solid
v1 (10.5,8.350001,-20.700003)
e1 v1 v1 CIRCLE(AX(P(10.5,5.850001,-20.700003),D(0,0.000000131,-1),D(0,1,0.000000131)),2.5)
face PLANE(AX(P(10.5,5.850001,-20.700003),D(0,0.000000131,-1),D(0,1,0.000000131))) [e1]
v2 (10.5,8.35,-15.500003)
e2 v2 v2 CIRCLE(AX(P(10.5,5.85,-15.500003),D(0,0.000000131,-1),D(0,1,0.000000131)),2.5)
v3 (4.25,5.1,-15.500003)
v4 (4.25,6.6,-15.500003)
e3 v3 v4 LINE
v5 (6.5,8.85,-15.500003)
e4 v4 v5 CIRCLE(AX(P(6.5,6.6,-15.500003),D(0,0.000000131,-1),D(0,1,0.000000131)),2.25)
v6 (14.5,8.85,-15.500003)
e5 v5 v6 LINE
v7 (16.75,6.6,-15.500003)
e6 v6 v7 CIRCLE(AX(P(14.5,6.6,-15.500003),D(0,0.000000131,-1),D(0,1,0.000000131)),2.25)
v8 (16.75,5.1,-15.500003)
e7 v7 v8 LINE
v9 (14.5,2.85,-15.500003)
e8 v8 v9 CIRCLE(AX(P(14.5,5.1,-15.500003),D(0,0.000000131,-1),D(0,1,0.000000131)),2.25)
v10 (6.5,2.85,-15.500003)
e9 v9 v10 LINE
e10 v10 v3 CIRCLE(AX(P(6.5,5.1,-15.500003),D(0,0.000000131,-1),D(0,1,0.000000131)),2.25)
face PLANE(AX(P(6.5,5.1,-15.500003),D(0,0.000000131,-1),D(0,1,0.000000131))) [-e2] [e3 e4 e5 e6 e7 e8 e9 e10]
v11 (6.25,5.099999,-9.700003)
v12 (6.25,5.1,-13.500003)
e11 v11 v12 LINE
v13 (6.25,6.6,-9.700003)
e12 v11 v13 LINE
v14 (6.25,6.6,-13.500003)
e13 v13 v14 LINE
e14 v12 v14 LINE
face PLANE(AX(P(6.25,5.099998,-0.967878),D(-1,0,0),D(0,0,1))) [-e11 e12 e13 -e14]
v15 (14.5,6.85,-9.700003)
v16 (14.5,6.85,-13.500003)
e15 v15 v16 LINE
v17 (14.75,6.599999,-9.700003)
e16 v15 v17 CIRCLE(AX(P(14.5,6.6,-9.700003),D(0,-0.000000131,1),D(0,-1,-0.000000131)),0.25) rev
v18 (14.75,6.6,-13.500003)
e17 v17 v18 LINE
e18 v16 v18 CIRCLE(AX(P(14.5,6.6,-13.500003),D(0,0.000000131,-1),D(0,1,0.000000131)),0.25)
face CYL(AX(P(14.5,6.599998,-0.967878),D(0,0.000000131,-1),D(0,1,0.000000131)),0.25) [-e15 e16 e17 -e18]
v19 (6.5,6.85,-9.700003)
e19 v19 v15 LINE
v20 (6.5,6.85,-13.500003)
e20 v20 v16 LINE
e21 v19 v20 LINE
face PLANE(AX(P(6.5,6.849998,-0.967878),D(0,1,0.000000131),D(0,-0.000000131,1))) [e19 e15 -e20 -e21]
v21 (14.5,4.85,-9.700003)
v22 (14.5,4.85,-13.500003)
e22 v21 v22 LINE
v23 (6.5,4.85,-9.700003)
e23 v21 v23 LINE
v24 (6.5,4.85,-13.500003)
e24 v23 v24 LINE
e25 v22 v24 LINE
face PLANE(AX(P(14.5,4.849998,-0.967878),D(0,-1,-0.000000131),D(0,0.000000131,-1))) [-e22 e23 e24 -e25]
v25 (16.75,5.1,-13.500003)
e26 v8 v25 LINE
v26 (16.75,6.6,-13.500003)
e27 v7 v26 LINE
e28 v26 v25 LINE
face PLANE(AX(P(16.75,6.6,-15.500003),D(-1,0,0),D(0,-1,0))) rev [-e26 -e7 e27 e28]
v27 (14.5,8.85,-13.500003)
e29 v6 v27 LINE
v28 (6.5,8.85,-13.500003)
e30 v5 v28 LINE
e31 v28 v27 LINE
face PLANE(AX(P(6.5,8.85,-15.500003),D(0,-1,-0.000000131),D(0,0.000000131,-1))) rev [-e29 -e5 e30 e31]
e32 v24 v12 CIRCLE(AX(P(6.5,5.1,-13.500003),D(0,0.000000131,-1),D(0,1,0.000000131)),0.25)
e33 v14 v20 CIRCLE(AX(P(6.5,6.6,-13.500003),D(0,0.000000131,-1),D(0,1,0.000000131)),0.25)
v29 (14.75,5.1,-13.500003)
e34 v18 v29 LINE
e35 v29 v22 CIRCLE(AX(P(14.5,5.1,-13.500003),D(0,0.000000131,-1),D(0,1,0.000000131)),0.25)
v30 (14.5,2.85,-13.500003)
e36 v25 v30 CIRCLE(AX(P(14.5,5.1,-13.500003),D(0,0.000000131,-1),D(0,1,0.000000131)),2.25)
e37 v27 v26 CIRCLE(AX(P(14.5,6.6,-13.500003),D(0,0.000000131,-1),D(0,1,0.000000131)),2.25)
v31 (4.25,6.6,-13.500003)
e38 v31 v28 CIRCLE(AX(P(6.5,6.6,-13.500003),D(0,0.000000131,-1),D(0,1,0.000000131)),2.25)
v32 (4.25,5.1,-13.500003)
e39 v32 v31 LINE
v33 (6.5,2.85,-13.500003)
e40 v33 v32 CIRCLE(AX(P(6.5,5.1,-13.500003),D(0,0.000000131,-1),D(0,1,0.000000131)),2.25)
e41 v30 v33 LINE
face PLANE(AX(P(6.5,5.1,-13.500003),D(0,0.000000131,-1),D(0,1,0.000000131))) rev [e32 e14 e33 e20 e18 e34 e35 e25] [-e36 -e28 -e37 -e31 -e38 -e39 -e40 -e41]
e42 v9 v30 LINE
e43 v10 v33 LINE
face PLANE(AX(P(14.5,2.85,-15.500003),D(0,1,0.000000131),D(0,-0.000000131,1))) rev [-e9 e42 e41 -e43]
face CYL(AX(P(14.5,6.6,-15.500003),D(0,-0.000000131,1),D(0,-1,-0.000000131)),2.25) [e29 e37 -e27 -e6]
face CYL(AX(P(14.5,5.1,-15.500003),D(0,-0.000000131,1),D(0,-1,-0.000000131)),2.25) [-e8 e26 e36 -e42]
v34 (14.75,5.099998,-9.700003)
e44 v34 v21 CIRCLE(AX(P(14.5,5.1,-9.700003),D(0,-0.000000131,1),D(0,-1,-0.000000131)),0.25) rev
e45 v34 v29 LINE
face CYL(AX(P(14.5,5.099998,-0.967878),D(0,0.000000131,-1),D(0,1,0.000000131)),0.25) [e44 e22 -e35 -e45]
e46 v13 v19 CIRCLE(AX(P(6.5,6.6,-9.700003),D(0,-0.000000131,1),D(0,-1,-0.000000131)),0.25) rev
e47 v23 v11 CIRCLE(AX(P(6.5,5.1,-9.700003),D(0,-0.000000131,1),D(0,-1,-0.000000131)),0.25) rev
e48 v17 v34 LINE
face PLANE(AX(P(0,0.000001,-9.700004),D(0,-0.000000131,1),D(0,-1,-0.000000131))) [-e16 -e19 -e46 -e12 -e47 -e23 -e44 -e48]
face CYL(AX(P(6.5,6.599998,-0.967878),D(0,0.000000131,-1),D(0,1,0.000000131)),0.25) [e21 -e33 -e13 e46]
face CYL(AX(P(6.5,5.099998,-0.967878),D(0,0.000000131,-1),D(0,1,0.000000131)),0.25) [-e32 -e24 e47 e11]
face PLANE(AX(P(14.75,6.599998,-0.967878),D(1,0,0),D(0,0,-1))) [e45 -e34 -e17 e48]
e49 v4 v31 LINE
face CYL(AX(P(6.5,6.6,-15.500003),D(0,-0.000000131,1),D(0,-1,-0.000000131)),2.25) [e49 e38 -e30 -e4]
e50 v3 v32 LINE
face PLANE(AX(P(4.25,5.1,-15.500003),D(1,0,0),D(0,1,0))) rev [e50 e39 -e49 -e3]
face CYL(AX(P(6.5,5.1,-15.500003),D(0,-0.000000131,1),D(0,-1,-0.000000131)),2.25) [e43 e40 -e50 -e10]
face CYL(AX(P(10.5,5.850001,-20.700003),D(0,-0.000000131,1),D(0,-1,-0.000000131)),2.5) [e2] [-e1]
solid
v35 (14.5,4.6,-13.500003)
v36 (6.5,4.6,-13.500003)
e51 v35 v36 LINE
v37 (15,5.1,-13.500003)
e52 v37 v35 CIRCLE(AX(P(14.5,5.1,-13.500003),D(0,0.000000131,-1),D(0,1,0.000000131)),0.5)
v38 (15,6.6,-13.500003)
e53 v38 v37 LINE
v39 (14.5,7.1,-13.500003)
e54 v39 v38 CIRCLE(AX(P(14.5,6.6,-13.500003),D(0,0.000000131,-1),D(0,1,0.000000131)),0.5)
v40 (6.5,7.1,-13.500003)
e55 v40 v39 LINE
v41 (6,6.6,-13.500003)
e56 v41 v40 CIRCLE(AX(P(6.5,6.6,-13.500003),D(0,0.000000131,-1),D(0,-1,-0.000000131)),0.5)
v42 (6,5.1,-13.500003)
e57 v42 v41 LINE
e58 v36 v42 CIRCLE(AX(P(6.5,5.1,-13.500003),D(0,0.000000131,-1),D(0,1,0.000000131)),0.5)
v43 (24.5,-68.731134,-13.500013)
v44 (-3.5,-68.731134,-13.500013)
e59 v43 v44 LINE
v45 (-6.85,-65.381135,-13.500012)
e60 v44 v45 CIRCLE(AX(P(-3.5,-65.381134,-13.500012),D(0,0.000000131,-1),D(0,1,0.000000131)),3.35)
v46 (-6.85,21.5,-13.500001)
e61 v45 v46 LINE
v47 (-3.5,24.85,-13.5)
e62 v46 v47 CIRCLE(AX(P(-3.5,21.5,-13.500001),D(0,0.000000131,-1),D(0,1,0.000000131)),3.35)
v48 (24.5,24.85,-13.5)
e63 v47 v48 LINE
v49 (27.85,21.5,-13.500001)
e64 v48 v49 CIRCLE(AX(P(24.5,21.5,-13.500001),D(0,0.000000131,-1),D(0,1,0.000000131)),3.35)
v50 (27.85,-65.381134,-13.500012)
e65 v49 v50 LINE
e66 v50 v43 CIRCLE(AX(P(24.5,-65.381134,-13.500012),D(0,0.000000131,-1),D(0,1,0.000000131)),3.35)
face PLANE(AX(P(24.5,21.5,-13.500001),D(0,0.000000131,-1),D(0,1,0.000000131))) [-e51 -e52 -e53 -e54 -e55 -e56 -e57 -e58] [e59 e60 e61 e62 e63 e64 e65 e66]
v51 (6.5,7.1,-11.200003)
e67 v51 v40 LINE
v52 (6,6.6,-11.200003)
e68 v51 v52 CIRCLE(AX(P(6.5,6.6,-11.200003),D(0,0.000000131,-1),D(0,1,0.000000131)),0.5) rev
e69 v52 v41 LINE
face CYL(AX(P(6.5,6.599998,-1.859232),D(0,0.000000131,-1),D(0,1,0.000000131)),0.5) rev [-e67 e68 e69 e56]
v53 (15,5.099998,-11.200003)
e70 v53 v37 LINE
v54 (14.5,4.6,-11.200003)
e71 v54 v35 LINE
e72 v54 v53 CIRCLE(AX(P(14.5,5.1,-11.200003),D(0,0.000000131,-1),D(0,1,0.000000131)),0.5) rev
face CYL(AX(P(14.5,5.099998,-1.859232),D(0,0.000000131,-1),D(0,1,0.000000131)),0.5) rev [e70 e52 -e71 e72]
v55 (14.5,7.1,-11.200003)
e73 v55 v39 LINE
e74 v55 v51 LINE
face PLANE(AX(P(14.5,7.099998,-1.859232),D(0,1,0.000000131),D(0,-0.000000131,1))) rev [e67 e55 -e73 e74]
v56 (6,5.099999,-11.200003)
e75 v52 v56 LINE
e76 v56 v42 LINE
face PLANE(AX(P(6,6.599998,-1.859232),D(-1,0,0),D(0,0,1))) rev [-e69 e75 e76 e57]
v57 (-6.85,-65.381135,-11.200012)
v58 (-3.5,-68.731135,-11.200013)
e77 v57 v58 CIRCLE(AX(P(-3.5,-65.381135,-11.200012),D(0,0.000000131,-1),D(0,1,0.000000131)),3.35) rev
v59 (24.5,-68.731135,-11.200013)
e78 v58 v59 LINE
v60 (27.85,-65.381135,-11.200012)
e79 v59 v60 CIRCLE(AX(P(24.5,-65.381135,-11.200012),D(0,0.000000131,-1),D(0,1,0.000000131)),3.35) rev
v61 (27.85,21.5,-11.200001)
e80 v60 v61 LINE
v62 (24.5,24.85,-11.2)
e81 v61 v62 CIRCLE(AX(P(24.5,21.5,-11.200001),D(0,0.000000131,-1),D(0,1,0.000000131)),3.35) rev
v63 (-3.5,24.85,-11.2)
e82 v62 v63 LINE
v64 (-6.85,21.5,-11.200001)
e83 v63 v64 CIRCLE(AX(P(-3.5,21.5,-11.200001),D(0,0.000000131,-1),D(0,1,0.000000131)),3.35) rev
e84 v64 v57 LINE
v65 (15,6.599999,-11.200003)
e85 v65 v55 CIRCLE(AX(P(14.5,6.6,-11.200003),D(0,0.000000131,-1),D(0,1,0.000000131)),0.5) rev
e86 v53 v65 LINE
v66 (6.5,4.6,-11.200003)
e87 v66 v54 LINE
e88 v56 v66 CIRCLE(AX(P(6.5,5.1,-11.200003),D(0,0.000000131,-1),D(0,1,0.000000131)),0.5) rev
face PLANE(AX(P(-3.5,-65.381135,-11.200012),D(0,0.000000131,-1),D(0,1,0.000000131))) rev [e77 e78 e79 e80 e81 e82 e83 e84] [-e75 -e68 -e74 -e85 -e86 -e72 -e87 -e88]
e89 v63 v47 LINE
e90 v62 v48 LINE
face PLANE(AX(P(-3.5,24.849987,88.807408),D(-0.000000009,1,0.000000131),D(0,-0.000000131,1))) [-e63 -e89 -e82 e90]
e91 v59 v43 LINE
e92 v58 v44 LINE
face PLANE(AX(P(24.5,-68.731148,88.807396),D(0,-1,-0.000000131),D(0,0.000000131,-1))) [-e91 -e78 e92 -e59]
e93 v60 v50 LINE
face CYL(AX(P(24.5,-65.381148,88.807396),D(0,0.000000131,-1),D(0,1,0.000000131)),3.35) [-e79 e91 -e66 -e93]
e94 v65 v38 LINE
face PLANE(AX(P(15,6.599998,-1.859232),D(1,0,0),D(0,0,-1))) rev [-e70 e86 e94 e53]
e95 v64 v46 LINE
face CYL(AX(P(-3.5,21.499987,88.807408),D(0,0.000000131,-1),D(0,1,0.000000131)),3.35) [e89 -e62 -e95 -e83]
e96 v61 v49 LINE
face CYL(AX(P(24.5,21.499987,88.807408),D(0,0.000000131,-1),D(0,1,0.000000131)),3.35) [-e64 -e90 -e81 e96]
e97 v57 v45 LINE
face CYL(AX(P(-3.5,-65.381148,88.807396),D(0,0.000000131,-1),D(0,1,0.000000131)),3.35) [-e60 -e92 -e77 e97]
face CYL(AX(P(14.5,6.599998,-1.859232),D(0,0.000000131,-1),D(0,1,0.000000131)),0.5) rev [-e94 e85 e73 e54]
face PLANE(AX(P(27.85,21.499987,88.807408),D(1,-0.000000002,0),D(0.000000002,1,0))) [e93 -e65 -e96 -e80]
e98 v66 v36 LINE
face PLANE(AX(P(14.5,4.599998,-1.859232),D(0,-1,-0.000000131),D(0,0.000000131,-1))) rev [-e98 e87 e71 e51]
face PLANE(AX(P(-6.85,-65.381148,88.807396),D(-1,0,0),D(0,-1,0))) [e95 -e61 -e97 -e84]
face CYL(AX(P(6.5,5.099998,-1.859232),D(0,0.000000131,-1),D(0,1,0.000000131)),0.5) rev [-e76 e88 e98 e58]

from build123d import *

# Parameters (mm, degrees)
STOCK_PB_TOP_LID_SM_1_START = 11.200003695
STOCK_PB_TOP_LID_SM_1_DEPTH = 2.3
BOSS_EXTRUDE1_DEPTH         = 3.8
BOSS_EXTRUDE2_DEPTH         = 2
SKETCH5_R                   = 2.5
BOSS_EXTRUDE3_DEPTH         = 5.2


# Read off the part's stored shape, not the designer's step: Stock-pb_top_lid_sm-1
with BuildPart() as part:
    # Stock-pb_top_lid_sm-1 outline → Stock-pb_top_lid_sm-1 (new body)
    with BuildSketch(Plane(origin=(0, 0, 0), x_dir=(1, 0, 0), z_dir=(0, 1.3113422028449806e-07, -0.9999999999999915)).offset(STOCK_PB_TOP_LID_SM_1_START)):
        with BuildLine():
            Line((-3.5, -24.849998248), (24.5, -24.849998482))
            ThreePointArc((24.5, -24.849998482), (26.868807895, -23.868806125), (27.850000252, -21.49999823))
            Line((27.850000252, -21.49999823), (27.85, 65.381136149))
            ThreePointArc((27.85, 65.381136149), (26.868807717, 67.749943866), (24.5, 68.731136149))
            Line((24.5, 68.731136149), (-3.5, 68.731136149))
            ThreePointArc((-3.5, 68.731136149), (-5.868807606, 67.749943977), (-6.85, 65.381136463))
            Line((-6.85, 65.381136463), (-6.850000018, -21.49999823))
            ThreePointArc((-6.850000018, -21.49999823), (-5.86880773, -23.86880596), (-3.5, -24.849998248))
        make_face()
        with BuildLine():
            ThreePointArc((14.500000108, -4.599998248), (14.853553499, -4.746444857), (15.000000108, -5.099998248))
            Line((15.000000108, -5.099998248), (15.000000108, -6.599997786))
            ThreePointArc((15.000000108, -6.599997786), (14.853553662, -6.953551475), (14.500000108, -7.099998248))
            Line((14.500000108, -7.099998248), (6.500000108, -7.099998248))
            ThreePointArc((6.500000108, -7.099998248), (6.146446718, -6.953551638), (6.000000108, -6.599998248))
            Line((6.000000108, -6.599998248), (6.000000108, -5.099998248))
            ThreePointArc((6.000000108, -5.099998248), (6.146446717, -4.746444858), (6.500000108, -4.599998248))
            Line((6.500000108, -4.599998248), (14.500000108, -4.599998248))
        make_face(mode=Mode.SUBTRACT)
    extrude(amount=STOCK_PB_TOP_LID_SM_1_DEPTH)


with BuildPart() as body_2:
    # Sketch3 → Boss-Extrude1 (new body)
    with BuildSketch(Plane(origin=(0, 1.77e-06, -13.500003695), x_dir=(-1, 0, 0), z_dir=(0, 1.3113422028449777e-07, -0.9999999999999915))):
        with BuildLine():
            Line((-14.500000108, 4.849998248), (-6.500000108, 4.849998248))
            ThreePointArc((-6.500000108, 4.849998248), (-6.323223413, 4.923221552), (-6.250000108, 5.099998248))
            Line((-6.250000108, 5.099998248), (-6.250000108, 6.599998248))
            ThreePointArc((-6.250000108, 6.599998248), (-6.323223413, 6.776774943), (-6.500000108, 6.849998248))
            Line((-6.500000108, 6.849998248), (-14.500000108, 6.849998248))
            ThreePointArc((-14.500000108, 6.849998248), (-14.676776803, 6.776774943), (-14.750000108, 6.599998248))
            Line((-14.750000108, 6.599998248), (-14.750000108, 5.099998248))
            ThreePointArc((-14.750000108, 5.099998248), (-14.676776803, 4.923221552), (-14.500000108, 4.849998248))
        make_face()
    extrude(amount=-BOSS_EXTRUDE1_DEPTH)

    # Sketch4 → Boss-Extrude2 (add)
    with BuildSketch(Plane(origin=(0, 1.77e-06, -13.500003695), x_dir=(-1, 0, 0), z_dir=(0, 1.311342202844978e-07, -0.9999999999999915))):
        with BuildLine():
            Line((-4.250000108, 5.099998248), (-4.250000108, 6.599998248))
            ThreePointArc((-4.250000108, 6.599998248), (-4.909009851, 8.190988505), (-6.500000108, 8.849998248))
            Line((-6.500000108, 8.849998248), (-14.500000108, 8.849998248))
            ThreePointArc((-14.500000108, 8.849998248), (-16.090990366, 8.190988505), (-16.750000108, 6.599998248))
            Line((-16.750000108, 6.599998248), (-16.750000108, 5.099998248))
            ThreePointArc((-16.750000108, 5.099998248), (-16.090990366, 3.50900799), (-14.500000108, 2.849998248))
            Line((-14.500000108, 2.849998248), (-6.500000108, 2.849998248))
            ThreePointArc((-6.500000108, 2.849998248), (-4.909009851, 3.50900799), (-4.250000108, 5.099998248))
        make_face()
    extrude(amount=BOSS_EXTRUDE2_DEPTH)

    # Sketch5 → Boss-Extrude3 (add)
    with BuildSketch(Plane(origin=(0, 2.033e-06, -15.500003695), x_dir=(-1, 0, 0), z_dir=(0, 1.3113422028449782e-07, -0.9999999999999915))):
        with Locations(Location((-10.500000108, 5.849998248, 0), (0, 0, 90))):
            Circle(SKETCH5_R)
    extrude(amount=BOSS_EXTRUDE3_DEPTH)


solid = Compound([part.part, body_2.part])
